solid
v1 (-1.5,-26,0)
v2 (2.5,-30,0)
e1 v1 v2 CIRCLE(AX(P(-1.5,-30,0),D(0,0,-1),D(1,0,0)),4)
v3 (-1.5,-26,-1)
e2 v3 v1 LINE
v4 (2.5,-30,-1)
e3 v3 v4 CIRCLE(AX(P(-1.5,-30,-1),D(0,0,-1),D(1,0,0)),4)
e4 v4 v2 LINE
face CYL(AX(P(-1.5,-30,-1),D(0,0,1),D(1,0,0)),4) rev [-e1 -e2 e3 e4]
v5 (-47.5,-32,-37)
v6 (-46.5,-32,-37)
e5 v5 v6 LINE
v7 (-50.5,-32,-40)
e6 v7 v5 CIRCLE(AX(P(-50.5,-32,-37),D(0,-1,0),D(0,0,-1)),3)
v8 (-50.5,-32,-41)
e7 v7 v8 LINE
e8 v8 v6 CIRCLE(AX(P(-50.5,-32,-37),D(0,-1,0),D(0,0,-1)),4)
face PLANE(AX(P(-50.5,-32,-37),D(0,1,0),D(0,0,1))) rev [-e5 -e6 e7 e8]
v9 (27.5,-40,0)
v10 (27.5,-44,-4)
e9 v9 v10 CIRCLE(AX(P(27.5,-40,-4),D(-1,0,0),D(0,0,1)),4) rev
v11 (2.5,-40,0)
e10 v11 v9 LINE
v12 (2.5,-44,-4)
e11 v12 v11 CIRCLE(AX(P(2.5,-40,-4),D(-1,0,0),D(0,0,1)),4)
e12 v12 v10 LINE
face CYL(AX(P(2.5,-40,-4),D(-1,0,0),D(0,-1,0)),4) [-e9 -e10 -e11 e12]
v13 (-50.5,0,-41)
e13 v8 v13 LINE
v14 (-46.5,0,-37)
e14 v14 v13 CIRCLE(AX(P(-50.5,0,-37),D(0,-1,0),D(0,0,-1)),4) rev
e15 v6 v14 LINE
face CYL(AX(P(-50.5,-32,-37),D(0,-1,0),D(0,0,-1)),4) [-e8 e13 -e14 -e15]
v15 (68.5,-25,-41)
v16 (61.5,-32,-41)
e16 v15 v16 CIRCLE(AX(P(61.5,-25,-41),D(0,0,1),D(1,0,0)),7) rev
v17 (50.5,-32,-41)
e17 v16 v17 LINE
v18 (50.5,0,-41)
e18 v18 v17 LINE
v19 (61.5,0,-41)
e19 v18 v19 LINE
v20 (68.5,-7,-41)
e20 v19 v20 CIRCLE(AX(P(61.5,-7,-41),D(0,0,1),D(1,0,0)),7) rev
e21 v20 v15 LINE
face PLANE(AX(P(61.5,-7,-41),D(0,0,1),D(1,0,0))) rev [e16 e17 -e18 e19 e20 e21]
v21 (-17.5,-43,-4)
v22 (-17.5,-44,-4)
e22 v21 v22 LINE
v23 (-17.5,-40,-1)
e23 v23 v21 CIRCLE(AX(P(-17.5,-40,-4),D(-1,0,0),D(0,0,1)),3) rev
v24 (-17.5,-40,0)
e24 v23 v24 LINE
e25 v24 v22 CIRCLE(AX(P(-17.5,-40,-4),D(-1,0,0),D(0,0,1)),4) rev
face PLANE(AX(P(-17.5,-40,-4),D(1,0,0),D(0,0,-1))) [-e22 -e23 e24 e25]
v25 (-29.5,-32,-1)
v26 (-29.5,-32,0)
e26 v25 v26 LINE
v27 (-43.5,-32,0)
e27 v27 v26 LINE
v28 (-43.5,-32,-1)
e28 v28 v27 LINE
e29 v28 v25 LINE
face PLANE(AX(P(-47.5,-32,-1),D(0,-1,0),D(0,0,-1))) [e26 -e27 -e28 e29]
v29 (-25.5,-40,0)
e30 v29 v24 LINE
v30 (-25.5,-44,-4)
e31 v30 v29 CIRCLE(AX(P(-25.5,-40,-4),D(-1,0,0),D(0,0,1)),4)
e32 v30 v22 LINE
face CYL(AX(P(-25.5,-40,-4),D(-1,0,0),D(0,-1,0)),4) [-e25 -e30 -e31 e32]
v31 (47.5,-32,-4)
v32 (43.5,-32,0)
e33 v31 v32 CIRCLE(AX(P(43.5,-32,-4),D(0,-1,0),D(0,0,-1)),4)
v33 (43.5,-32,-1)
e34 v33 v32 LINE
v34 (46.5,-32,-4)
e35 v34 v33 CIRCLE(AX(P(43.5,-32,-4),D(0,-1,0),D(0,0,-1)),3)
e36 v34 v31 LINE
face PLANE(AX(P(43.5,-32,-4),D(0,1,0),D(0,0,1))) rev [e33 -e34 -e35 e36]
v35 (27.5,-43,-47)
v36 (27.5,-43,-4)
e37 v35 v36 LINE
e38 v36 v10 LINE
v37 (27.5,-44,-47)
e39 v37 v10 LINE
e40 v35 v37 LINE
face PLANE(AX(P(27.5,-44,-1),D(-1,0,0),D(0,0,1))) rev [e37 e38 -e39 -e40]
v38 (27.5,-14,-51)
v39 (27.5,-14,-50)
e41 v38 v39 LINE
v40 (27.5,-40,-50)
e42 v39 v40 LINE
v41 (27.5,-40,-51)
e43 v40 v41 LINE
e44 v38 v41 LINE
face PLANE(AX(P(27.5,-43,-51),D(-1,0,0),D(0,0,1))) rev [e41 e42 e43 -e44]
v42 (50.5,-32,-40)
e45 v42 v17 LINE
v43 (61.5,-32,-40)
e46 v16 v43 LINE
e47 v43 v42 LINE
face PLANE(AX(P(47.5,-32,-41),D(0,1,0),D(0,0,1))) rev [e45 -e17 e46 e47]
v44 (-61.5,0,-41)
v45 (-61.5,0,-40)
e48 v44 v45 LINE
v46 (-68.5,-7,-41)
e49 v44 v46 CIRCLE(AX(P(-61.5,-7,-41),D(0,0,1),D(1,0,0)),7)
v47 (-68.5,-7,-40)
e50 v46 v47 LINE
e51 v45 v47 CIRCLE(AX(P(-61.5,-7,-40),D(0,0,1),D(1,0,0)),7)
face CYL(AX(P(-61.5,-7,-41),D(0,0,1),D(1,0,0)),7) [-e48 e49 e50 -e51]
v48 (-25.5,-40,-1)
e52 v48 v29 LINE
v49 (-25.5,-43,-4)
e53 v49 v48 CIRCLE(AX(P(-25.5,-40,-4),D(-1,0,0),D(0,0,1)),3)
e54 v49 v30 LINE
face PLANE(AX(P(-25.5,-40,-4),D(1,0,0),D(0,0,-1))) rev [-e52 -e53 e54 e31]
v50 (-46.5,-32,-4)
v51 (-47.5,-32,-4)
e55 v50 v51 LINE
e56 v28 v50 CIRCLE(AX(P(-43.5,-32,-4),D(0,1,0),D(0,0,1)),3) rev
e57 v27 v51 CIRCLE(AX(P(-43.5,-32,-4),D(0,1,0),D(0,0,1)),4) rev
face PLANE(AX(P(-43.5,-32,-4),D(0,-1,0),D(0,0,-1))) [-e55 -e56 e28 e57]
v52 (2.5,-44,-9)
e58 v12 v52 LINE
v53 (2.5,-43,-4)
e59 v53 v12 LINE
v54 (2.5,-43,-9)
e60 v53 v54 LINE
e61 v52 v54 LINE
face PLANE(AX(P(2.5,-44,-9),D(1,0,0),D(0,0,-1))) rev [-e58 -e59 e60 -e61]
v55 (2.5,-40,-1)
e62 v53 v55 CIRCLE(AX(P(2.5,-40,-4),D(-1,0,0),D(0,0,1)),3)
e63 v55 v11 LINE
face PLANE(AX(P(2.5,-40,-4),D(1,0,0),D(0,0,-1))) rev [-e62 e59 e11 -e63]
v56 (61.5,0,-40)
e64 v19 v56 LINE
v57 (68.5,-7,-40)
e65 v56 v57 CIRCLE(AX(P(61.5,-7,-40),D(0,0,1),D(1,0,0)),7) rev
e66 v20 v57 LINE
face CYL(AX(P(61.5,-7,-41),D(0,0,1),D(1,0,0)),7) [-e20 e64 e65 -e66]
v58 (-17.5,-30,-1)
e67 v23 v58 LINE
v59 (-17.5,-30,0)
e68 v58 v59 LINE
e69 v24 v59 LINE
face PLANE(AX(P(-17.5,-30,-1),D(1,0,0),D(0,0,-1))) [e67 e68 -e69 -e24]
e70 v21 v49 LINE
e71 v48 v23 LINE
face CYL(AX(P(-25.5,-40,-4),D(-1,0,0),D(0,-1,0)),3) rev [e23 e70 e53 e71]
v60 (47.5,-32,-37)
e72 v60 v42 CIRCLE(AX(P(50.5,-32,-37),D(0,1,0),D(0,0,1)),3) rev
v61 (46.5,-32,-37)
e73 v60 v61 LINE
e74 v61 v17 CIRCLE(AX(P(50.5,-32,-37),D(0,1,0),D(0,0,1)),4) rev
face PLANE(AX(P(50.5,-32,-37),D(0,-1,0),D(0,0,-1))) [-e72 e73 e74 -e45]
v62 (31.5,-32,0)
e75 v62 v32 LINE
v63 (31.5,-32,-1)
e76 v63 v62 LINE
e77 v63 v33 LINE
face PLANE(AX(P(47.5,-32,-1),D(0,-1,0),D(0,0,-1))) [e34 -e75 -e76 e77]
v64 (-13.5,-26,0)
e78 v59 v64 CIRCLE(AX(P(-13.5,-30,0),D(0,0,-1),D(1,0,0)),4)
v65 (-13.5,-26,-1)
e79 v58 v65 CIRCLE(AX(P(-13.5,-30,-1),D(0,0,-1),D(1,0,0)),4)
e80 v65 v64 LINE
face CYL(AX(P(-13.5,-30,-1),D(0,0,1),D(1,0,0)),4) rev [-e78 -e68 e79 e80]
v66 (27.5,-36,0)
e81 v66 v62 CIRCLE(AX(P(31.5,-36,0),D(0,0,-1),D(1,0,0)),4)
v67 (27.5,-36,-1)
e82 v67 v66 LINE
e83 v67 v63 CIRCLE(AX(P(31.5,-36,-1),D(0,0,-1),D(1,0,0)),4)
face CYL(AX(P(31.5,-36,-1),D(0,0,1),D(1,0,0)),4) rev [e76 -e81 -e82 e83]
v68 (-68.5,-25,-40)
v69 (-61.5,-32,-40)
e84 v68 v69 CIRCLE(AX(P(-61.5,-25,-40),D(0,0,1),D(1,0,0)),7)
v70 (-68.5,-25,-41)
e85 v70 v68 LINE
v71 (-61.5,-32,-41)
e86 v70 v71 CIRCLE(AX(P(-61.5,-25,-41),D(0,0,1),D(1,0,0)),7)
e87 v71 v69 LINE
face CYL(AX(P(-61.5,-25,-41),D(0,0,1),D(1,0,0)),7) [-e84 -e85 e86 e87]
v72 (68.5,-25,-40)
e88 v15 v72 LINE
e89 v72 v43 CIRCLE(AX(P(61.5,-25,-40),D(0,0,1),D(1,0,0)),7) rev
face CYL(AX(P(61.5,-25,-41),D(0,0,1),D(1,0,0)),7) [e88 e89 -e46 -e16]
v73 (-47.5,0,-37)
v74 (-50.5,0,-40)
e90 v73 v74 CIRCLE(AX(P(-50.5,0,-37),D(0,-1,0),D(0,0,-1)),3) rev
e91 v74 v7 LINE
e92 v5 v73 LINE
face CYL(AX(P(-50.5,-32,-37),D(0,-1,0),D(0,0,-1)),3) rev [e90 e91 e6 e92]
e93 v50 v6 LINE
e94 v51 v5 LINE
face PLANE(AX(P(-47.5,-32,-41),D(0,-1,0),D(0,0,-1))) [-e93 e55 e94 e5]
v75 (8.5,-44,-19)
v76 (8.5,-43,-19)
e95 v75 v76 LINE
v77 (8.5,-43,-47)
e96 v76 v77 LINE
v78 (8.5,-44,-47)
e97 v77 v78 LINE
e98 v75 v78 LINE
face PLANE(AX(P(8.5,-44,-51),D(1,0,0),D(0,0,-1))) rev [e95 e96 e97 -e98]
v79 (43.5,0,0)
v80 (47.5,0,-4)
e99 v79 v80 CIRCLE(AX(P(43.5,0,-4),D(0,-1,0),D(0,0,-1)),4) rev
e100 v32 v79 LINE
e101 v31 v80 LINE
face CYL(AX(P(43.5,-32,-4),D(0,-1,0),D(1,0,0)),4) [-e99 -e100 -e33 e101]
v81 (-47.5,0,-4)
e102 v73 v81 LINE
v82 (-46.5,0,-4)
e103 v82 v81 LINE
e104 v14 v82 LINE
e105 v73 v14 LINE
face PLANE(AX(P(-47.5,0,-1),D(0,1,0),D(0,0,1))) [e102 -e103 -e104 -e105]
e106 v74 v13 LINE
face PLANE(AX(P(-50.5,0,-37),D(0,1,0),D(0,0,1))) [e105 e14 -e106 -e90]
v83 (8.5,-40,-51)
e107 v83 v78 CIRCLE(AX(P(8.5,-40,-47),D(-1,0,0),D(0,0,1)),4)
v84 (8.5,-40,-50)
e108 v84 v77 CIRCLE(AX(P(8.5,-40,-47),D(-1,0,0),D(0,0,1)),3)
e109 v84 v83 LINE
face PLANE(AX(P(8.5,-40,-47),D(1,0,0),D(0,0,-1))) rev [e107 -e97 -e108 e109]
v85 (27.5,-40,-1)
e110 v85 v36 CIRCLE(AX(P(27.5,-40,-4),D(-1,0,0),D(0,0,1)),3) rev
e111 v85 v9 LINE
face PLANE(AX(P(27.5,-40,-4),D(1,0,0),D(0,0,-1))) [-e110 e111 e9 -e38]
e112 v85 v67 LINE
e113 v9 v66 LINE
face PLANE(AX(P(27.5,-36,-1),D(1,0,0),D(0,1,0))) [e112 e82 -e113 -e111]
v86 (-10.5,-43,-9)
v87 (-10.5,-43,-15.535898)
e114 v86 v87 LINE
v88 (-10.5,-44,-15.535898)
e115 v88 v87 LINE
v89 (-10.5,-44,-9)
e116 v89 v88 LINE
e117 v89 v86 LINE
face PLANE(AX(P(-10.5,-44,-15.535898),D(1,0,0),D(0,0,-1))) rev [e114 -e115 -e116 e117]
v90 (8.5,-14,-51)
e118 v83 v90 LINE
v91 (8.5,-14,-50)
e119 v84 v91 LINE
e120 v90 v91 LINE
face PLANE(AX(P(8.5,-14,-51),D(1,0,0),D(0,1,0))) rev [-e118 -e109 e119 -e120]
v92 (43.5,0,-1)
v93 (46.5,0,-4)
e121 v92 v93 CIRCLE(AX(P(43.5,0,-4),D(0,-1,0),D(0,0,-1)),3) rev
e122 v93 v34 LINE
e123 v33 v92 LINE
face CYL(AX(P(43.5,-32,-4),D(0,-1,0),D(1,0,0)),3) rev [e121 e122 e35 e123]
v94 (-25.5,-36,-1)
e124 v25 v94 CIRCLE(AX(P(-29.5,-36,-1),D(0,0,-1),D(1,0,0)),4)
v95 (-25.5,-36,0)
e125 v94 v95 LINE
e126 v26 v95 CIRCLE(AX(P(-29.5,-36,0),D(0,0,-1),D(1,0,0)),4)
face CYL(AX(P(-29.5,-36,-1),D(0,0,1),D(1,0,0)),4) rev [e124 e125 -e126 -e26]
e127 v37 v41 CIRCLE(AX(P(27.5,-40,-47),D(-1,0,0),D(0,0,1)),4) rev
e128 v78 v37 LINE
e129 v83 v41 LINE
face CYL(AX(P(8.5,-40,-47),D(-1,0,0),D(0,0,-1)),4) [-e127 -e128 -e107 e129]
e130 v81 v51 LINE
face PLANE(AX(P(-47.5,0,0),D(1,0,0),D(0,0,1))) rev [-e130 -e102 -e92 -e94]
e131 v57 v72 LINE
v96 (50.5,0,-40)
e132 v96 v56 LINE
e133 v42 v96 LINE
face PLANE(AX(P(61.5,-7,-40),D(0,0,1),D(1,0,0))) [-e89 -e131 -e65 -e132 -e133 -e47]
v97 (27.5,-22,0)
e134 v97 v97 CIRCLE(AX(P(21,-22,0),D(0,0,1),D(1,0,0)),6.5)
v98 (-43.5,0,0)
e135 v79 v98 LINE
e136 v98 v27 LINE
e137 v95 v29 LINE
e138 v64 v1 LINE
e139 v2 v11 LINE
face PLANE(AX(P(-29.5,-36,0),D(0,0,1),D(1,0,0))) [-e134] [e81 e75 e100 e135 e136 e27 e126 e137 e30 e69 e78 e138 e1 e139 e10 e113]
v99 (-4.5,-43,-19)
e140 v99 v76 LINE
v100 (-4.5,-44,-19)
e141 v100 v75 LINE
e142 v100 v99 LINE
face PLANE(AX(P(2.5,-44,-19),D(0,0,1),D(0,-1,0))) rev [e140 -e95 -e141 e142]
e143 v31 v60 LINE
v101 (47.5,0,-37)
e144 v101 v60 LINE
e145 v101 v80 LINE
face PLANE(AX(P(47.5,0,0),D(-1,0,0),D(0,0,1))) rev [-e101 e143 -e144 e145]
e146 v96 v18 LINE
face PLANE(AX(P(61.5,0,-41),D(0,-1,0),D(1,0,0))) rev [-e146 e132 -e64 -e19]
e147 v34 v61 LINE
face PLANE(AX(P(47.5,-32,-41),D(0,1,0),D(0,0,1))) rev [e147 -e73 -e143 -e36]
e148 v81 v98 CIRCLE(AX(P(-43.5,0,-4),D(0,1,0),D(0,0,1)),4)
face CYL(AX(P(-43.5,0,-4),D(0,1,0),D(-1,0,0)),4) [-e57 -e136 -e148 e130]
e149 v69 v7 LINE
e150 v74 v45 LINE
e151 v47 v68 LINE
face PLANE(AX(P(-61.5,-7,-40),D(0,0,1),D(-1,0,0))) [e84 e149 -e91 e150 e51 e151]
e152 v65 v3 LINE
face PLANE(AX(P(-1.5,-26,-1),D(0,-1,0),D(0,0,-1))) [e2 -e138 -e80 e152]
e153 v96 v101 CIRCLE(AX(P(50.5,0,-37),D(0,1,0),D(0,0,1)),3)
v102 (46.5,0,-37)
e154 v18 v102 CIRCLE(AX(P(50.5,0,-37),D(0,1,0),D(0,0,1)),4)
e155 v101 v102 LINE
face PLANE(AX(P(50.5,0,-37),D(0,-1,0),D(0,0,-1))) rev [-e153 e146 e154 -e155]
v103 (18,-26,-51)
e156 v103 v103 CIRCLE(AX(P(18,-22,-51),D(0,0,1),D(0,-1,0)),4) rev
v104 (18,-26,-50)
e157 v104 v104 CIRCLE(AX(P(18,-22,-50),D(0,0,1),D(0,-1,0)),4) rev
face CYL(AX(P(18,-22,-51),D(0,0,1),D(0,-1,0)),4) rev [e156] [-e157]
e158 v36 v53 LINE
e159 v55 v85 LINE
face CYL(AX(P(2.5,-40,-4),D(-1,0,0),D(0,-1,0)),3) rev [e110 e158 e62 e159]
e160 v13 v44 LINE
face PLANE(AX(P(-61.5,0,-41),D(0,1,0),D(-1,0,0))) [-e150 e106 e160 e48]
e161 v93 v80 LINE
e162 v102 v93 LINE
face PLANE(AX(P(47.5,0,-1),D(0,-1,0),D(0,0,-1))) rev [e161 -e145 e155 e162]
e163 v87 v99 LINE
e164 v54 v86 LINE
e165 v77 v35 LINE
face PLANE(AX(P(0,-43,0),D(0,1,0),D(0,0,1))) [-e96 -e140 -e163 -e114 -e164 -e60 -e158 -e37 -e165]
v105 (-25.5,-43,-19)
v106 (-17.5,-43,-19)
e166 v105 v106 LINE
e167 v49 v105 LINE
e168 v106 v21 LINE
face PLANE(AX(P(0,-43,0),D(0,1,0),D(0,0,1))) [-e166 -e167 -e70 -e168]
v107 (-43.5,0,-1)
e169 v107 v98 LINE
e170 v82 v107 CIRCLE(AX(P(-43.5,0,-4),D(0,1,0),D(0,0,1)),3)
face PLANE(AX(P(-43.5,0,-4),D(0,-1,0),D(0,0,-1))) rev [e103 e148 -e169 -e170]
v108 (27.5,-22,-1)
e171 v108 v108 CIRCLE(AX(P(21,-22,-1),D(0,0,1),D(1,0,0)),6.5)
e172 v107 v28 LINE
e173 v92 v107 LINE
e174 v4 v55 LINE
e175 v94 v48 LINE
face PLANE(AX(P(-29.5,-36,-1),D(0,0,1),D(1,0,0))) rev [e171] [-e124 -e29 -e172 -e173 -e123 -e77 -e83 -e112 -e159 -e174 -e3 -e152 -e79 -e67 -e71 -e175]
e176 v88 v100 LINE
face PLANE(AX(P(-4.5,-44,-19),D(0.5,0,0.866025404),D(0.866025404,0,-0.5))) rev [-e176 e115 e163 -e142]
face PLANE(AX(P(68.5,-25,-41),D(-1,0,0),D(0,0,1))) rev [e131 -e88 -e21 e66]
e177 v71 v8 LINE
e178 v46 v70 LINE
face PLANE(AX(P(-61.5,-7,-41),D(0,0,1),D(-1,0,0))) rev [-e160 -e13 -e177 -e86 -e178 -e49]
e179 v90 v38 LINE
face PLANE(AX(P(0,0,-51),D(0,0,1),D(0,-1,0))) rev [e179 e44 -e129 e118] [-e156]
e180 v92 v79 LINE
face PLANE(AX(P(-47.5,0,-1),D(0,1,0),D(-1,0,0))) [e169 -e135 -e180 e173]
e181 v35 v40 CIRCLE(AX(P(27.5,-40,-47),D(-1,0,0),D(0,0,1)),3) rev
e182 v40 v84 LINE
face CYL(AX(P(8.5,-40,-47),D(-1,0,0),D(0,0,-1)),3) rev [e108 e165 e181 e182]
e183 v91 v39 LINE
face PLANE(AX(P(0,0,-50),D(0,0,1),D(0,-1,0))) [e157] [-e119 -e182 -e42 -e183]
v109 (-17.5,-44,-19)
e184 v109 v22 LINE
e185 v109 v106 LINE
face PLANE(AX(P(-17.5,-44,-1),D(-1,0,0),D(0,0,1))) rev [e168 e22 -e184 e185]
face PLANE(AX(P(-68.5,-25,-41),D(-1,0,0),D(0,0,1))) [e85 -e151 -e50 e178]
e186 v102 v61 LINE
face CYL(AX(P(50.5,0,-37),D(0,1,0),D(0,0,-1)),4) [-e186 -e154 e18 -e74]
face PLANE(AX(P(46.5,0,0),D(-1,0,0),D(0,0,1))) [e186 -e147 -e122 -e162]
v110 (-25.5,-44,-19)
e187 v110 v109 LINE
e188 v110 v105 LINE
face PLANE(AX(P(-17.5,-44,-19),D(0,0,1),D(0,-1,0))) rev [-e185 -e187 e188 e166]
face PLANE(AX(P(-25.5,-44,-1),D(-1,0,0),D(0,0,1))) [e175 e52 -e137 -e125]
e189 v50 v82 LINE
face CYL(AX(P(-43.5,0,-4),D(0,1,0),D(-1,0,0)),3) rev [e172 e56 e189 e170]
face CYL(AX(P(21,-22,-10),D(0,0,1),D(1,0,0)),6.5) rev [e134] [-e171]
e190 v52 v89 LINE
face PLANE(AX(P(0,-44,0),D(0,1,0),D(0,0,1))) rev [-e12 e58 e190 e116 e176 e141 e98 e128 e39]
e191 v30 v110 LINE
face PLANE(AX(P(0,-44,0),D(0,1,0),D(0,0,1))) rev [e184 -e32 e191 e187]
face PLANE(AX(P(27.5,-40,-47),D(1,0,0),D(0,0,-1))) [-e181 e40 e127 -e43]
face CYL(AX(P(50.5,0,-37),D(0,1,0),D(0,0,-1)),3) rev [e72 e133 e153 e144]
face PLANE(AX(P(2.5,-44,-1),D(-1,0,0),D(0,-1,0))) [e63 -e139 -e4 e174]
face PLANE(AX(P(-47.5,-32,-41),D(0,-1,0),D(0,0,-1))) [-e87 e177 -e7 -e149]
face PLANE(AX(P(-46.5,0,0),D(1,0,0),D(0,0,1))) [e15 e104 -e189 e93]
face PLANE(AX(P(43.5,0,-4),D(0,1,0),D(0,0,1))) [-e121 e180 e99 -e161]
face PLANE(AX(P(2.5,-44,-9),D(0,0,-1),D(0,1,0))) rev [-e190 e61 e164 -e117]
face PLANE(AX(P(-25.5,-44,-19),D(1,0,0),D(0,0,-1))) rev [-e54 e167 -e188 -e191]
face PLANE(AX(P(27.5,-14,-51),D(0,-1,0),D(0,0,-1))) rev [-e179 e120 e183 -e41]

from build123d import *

# Parameters (mm, degrees)
BASE_FLANGE1_DEPTH           = 1
SKETCH6_R                    = 6.5
CUT_EXTRUDE1_DEPTH           = 10
EDGE_FLANGE1_STRIP_W         = 10
EDGE_FLANGE1_STRIP_H         = 1
EDGE_FLANGE1_STRIP_CUT_DEPTH = 32
EDGE_FLANGE1_DEPTH           = 32
EDGE_FLANGE2_STRIP_W         = 10
EDGE_FLANGE2_STRIP_H         = 1
EDGE_FLANGE2_STRIP_CUT_DEPTH = 32
EDGE_FLANGE2_DEPTH           = 32
EDGE_FLANGE2_FLAT_DEPTH      = 1
EDGE_FLANGE3_STRIP_W         = 10
EDGE_FLANGE3_STRIP_H         = 1
EDGE_FLANGE3_STRIP_CUT_DEPTH = 8
EDGE_FLANGE3_DEPTH           = 8
EDGE_FLANGE4_STRIP_W         = 10
EDGE_FLANGE4_STRIP_H         = 1
EDGE_FLANGE4_STRIP_CUT_DEPTH = 25
EDGE_FLANGE4_DEPTH           = 25
EDGE_FLANGE4_FLAT_DEPTH      = 1
EDGE_FLANGE5_STRIP_W         = 10
EDGE_FLANGE5_STRIP_H         = 1
EDGE_FLANGE5_STRIP_CUT_DEPTH = 19
EDGE_FLANGE5_DEPTH           = 19
EDGE_FLANGE5_PROFILE_W       = 19
EDGE_FLANGE5_PROFILE_H       = 26
EDGE_FLANGE5_PROFILE_R       = 4
EDGE_FLANGE5_FLAT_DEPTH      = 1


# Sheet-metal steps are written as plain solids
with BuildPart() as part:
    # Sketch1 → Base-Flange1 (new body)
    with BuildSketch(Plane.XY):
        with BuildLine():
            Line((-47.5, 0), (47.5, 0))
            Line((47.5, 0), (47.5, -32))
            Line((47.5, -32), (31.5, -32))
            ThreePointArc((31.5, -32), (28.671572875, -33.171572875), (27.5, -36))
            Line((27.5, -36), (27.5, -44))
            Line((27.5, -44), (2.5, -44))
            Line((2.5, -44), (2.5, -30))
            ThreePointArc((2.5, -30), (1.328427125, -27.171572875), (-1.5, -26))
            Line((-1.5, -26), (-13.5, -26))
            ThreePointArc((-13.5, -26), (-16.328427125, -27.171572875), (-17.5, -30))
            Line((-17.5, -30), (-17.5, -44))
            Line((-17.5, -44), (-25.5, -44))
            Line((-25.5, -44), (-25.5, -36))
            ThreePointArc((-25.5, -36), (-26.671572875, -33.171572875), (-29.5, -32))
            Line((-29.5, -32), (-47.5, -32))
            Line((-47.5, -32), (-47.5, 0))
        make_face()
    extrude(amount=-BASE_FLANGE1_DEPTH)

    # Sketch6 → Cut-Extrude1 (cut)
    with BuildSketch(Plane.XY):
        with Locations((21, -22)):
            Circle(SKETCH6_R)
    extrude(amount=-CUT_EXTRUDE1_DEPTH, mode=Mode.SUBTRACT)

    # Edge-Flange1 strip (across the edge) → Edge-Flange1 strip cut (cut)
    with BuildSketch(Plane(origin=(47.5, 0, -1), x_dir=(-1, 0, 0), z_dir=(0, -1, 0))):
        with Locations((-1, -0.5)):
            Rectangle(EDGE_FLANGE1_STRIP_W, EDGE_FLANGE1_STRIP_H)
    edge_flange1_strip_cut = extrude(amount=EDGE_FLANGE1_STRIP_CUT_DEPTH, mode=Mode.SUBTRACT)

    # Edge-Flange1 section (across the edge) → Edge-Flange1 (add)
    with BuildSketch(Plane(origin=(47.5, 0, -1), x_dir=(-1, 0, 0), z_dir=(0, -1, 0))):
        with BuildLine():
            Line((0, 3), (0, 40))
            Line((0, 40), (1, 40))
            Line((1, 40), (1, 3))
            ThreePointArc((1, 3), (1.878679656, 0.878679656), (4, 0))
            Line((4, 0), (4, -1))
            ThreePointArc((4, -1), (1.171572875, 0.171572875), (0, 3))
        make_face()
    edge_flange1 = extrude(amount=EDGE_FLANGE1_DEPTH)

    # Edge-Flange2 strip (across the edge) → Edge-Flange2 strip cut (cut)
    with BuildSketch(Plane(origin=(47.5, -32, -41), x_dir=(0, 0, 1), z_dir=(0, 1, 0))):
        with Locations((-1, -0.5)):
            Rectangle(EDGE_FLANGE2_STRIP_W, EDGE_FLANGE2_STRIP_H)
    edge_flange2_strip_cut = extrude(amount=EDGE_FLANGE2_STRIP_CUT_DEPTH, mode=Mode.SUBTRACT)

    # Edge-Flange2 bend section (across the edge) → Edge-Flange2 (add)
    with BuildSketch(Plane(origin=(47.5, -32, -41), x_dir=(0, 0, 1), z_dir=(0, 1, 0))):
        with BuildLine():
            Line((0, 3), (1, 3))
            ThreePointArc((1, 3), (1.878679656, 0.878679656), (4, 0))
            Line((4, 0), (4, -1))
            ThreePointArc((4, -1), (1.171572875, 0.171572875), (0, 3))
        make_face()
    edge_flange2 = extrude(amount=EDGE_FLANGE2_DEPTH)

    # Edge-Flange2 profile (on flange) → Edge-Flange2 flat (add)
    with BuildSketch(Plane(origin=(47.5, 0, -41), x_dir=(0, 1, 0), z_dir=(0, 0, -1))):
        with BuildLine():
            Line((-32, 3), (0, 3))
            Line((0, 3), (0, 14))
            ThreePointArc((0, 14), (-2.050252532, 18.949747468), (-7, 21))
            Line((-7, 21), (-25, 21))
            ThreePointArc((-25, 21), (-29.949747468, 18.949747468), (-32, 14))
            Line((-32, 14), (-32, 3))
        make_face()
    edge_flange2_flat = extrude(amount=-EDGE_FLANGE2_FLAT_DEPTH)

    # Mirror1: Edge-Flange1 strip cut, Edge-Flange1, Edge-Flange2 strip cut, Edge-Flange2, Edge-Flange2 flat across plane
    add(edge_flange1_strip_cut.mirror(Plane(origin=(0, 0, 0), x_dir=(0, 0, 1), z_dir=(1, 0, 0))), mode=Mode.SUBTRACT)
    add(edge_flange1.mirror(Plane(origin=(0, 0, 0), x_dir=(0, 0, 1), z_dir=(1, 0, 0))))
    add(edge_flange2_strip_cut.mirror(Plane(origin=(0, 0, 0), x_dir=(0, 0, 1), z_dir=(1, 0, 0))), mode=Mode.SUBTRACT)
    add(edge_flange2.mirror(Plane(origin=(0, 0, 0), x_dir=(0, 0, 1), z_dir=(1, 0, 0))))
    add(edge_flange2_flat.mirror(Plane(origin=(0, 0, 0), x_dir=(0, 0, 1), z_dir=(1, 0, 0))))

    # Edge-Flange3 strip (across the edge) → Edge-Flange3 strip cut (cut)
    with BuildSketch(Plane(origin=(-17.5, -44, -1), x_dir=(0, 1, 0), z_dir=(-1, 0, 0))):
        with Locations((-1, -0.5)):
            Rectangle(EDGE_FLANGE3_STRIP_W, EDGE_FLANGE3_STRIP_H)
    extrude(amount=EDGE_FLANGE3_STRIP_CUT_DEPTH, mode=Mode.SUBTRACT)

    # Edge-Flange3 section (across the edge) → Edge-Flange3 (add)
    with BuildSketch(Plane(origin=(-17.5, -44, -1), x_dir=(0, 1, 0), z_dir=(-1, 0, 0))):
        with BuildLine():
            Line((0, 3), (0, 18))
            Line((0, 18), (1, 18))
            Line((1, 18), (1, 3))
            ThreePointArc((1, 3), (1.878679656, 0.878679656), (4, 0))
            Line((4, 0), (4, -1))
            ThreePointArc((4, -1), (1.171572875, 0.171572875), (0, 3))
        make_face()
    extrude(amount=EDGE_FLANGE3_DEPTH)

    # Edge-Flange4 strip (across the edge) → Edge-Flange4 strip cut (cut)
    with BuildSketch(Plane(origin=(27.5, -44, -1), x_dir=(0, 1, 0), z_dir=(-1, 0, 0))):
        with Locations((-1, -0.5)):
            Rectangle(EDGE_FLANGE4_STRIP_W, EDGE_FLANGE4_STRIP_H)
    extrude(amount=EDGE_FLANGE4_STRIP_CUT_DEPTH, mode=Mode.SUBTRACT)

    # Edge-Flange4 bend section (across the edge) → Edge-Flange4 (add)
    with BuildSketch(Plane(origin=(27.5, -44, -1), x_dir=(0, 1, 0), z_dir=(-1, 0, 0))):
        with BuildLine():
            Line((0, 3), (1, 3))
            ThreePointArc((1, 3), (1.878679656, 0.878679656), (4, 0))
            Line((4, 0), (4, -1))
            ThreePointArc((4, -1), (1.171572875, 0.171572875), (0, 3))
        make_face()
    extrude(amount=EDGE_FLANGE4_DEPTH)

    # Edge-Flange4 profile (on flange) → Edge-Flange4 flat (add)
    with BuildSketch(Plane(origin=(0, -44, -1), x_dir=(-1, 0, 0), z_dir=(0, -1, 0))):
        Polygon((-27.5, 3), (-2.5, 3), (-2.5, 8), (10.5, 8), (10.5, 14.535898385), (4.5, 18), (-2.5, 18), (-8.5, 18), (-8.5, 50), (-27.5, 50), align=None)
    extrude(amount=-EDGE_FLANGE4_FLAT_DEPTH)

    # Edge-Flange5 strip (across the edge) → Edge-Flange5 strip cut (cut)
    with BuildSketch(Plane(origin=(27.5, -43, -51), x_dir=(0, 0, 1), z_dir=(-1, 0, 0))):
        with Locations((-1, -0.5)):
            Rectangle(EDGE_FLANGE5_STRIP_W, EDGE_FLANGE5_STRIP_H)
    extrude(amount=EDGE_FLANGE5_STRIP_CUT_DEPTH, mode=Mode.SUBTRACT)

    # Edge-Flange5 bend section (across the edge) → Edge-Flange5 (add)
    with BuildSketch(Plane(origin=(27.5, -43, -51), x_dir=(0, 0, 1), z_dir=(-1, 0, 0))):
        with BuildLine():
            Line((0, 3), (1, 3))
            ThreePointArc((1, 3), (1.878679656, 0.878679656), (4, 0))
            Line((4, 0), (4, -1))
            ThreePointArc((4, -1), (1.171572875, 0.171572875), (0, 3))
        make_face()
    extrude(amount=EDGE_FLANGE5_DEPTH)

    # Edge-Flange5 profile (on flange) → Edge-Flange5 flat (add)
    with BuildSketch(Plane(origin=(0, -43, -51), x_dir=(-1, 0, 0), z_dir=(0, 0, -1))):
        with Locations((-18, 16)):
            Rectangle(EDGE_FLANGE5_PROFILE_W, EDGE_FLANGE5_PROFILE_H)
        with Locations((-18, 21)):
            Circle(EDGE_FLANGE5_PROFILE_R, mode=Mode.SUBTRACT)
    extrude(amount=-EDGE_FLANGE5_FLAT_DEPTH)


solid = part.part
